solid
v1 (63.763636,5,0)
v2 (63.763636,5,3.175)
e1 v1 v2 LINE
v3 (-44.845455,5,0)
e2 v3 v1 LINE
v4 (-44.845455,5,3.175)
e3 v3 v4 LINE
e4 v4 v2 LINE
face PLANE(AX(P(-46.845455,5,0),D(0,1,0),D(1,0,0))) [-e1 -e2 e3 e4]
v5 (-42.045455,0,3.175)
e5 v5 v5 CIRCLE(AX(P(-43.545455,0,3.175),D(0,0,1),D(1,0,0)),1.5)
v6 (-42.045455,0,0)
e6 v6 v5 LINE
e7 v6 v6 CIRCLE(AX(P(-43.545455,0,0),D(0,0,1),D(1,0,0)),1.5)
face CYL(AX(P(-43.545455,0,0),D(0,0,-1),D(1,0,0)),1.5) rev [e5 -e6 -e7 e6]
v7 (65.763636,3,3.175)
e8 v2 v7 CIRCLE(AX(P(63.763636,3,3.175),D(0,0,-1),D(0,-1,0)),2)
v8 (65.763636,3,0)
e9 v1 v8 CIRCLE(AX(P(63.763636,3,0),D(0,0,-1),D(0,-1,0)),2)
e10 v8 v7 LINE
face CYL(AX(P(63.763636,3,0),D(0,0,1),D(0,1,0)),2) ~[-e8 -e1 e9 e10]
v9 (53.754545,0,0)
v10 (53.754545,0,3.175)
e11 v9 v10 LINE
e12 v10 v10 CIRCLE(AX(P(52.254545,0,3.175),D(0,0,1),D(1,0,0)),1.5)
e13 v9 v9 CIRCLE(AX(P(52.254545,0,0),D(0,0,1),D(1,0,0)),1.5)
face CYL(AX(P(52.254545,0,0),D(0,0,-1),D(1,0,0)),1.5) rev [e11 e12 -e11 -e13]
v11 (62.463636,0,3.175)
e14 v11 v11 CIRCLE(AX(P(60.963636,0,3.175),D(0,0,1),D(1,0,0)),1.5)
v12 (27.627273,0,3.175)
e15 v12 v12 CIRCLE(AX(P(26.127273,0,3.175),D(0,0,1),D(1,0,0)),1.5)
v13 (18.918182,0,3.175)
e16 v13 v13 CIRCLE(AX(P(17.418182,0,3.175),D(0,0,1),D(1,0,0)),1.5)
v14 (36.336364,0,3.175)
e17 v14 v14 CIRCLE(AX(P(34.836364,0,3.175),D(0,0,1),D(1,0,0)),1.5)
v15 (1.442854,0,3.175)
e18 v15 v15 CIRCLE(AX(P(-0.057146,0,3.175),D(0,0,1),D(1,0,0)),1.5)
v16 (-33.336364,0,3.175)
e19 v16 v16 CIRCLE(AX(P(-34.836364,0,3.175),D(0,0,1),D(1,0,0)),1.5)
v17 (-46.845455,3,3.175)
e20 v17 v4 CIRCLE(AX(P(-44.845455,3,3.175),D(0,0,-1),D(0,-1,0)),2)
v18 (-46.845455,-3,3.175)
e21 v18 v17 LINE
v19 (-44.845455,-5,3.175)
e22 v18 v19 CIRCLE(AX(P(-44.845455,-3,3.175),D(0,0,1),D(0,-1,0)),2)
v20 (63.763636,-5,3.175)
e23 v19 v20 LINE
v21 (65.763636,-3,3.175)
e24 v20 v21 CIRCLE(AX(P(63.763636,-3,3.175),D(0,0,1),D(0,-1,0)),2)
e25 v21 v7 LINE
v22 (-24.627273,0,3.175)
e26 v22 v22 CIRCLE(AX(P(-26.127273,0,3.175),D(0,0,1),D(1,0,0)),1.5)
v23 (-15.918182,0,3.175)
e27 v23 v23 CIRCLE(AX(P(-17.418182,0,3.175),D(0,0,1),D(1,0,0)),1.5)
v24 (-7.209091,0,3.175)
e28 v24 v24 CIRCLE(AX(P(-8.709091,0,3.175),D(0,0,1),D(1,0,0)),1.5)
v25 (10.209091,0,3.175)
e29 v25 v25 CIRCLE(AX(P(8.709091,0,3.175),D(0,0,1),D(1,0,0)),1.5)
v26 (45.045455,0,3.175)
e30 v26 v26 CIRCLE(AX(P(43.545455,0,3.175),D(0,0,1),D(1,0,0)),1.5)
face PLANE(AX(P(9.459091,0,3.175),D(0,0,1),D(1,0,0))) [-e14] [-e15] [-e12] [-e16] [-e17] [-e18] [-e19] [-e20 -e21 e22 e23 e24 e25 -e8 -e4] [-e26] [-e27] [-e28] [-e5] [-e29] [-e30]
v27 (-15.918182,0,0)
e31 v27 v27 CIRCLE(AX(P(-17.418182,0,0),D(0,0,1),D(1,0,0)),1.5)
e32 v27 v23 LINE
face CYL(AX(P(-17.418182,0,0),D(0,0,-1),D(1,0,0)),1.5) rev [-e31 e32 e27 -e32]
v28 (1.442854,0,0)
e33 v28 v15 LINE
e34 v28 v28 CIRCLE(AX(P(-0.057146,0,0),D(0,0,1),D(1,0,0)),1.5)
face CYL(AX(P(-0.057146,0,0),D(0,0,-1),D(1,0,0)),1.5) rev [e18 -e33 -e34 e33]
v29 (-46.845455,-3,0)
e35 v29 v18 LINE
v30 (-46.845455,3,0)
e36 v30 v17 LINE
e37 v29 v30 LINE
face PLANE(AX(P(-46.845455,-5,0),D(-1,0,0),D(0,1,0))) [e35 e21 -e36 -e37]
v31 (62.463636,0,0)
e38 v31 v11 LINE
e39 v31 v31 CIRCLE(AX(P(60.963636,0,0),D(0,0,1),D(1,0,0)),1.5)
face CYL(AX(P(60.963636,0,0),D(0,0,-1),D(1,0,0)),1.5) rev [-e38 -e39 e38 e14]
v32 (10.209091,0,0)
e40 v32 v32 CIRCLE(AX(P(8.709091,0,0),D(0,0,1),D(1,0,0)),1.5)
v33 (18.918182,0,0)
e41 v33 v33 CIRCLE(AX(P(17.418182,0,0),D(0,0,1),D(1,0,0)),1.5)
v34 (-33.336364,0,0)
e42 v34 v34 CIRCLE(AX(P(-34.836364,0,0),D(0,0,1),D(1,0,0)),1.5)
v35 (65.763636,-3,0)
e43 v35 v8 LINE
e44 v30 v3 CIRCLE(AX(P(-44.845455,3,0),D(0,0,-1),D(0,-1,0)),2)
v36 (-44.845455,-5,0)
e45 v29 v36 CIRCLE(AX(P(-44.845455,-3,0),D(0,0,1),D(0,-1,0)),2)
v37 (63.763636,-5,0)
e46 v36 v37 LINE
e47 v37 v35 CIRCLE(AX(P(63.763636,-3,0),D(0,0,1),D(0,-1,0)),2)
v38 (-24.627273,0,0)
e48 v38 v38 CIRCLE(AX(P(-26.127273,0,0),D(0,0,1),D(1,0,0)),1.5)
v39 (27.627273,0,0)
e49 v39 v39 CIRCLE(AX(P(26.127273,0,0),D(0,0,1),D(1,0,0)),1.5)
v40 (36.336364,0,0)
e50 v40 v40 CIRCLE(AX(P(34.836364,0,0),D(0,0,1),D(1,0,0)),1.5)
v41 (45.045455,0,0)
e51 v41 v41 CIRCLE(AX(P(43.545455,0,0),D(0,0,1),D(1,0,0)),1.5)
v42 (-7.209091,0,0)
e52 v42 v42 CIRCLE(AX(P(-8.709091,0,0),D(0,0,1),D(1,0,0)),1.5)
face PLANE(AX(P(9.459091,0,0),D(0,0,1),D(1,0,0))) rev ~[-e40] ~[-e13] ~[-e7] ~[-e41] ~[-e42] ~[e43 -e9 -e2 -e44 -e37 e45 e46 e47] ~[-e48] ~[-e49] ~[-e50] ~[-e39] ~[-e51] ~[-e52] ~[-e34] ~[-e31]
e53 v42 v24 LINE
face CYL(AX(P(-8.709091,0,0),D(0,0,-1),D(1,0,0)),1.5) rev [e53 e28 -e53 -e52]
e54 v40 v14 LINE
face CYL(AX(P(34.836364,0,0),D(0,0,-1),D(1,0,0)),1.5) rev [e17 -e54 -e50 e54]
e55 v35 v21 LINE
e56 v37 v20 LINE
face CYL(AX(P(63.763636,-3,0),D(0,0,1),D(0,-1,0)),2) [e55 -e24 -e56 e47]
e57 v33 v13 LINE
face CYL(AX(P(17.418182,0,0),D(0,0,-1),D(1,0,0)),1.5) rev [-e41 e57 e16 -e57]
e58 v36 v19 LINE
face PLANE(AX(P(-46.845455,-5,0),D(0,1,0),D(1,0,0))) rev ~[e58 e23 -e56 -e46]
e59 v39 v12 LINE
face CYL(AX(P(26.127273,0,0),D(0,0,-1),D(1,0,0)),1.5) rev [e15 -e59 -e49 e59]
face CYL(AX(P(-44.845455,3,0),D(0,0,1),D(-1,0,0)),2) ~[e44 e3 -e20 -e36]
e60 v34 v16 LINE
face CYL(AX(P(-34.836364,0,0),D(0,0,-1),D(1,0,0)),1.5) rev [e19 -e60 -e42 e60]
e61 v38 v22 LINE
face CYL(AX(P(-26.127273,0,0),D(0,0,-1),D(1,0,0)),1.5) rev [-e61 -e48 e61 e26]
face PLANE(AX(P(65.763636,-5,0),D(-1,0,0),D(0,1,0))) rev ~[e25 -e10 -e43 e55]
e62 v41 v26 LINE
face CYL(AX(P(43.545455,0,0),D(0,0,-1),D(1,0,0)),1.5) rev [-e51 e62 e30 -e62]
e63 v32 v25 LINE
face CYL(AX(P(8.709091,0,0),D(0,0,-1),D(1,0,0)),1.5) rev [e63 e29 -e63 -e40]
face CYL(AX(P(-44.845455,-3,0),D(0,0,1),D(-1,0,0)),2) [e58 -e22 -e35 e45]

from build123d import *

# Parameters (mm, degrees)
F0_W     = 112.6090909091
F0_H     = 10
F0_R     = 1.5
F1_DEPTH = 3.175
F2_R     = 2


# Not quite as in the source:
# - a length typed as a fraction of an inch, garbled in the dataset ("3 / 203.2 mm" for 3/8 in), is restored


with BuildPart() as f1:
    # F0 (on Top) → F1 (new body)
    with BuildSketch(Plane.XY):
        with Locations((9.4590909091, 0)):
            Rectangle(F0_W, F0_H)
        with Locations((-43.5454545455, 0)):
            Circle(F0_R, mode=Mode.SUBTRACT)
        with Locations((-34.8363636364, 0)):
            Circle(F0_R, mode=Mode.SUBTRACT)
        with Locations((-26.1272727273, 0)):
            Circle(F0_R, mode=Mode.SUBTRACT)
        with Locations((-17.4181818182, 0)):
            Circle(F0_R, mode=Mode.SUBTRACT)
        with Locations((-8.7090909091, 0)):
            Circle(F0_R, mode=Mode.SUBTRACT)
        with Locations((-0.0571461482, 0)):
            Circle(F0_R, mode=Mode.SUBTRACT)
        with Locations((8.7090909091, 0)):
            Circle(F0_R, mode=Mode.SUBTRACT)
        with Locations((17.4181818182, 0)):
            Circle(F0_R, mode=Mode.SUBTRACT)
        with Locations((26.1272727273, 0)):
            Circle(F0_R, mode=Mode.SUBTRACT)
        with Locations((34.8363636364, 0)):
            Circle(F0_R, mode=Mode.SUBTRACT)
        with Locations((43.5454545455, 0)):
            Circle(F0_R, mode=Mode.SUBTRACT)
        with Locations((52.2545454545, 0)):
            Circle(F0_R, mode=Mode.SUBTRACT)
        with Locations((60.9636363636, 0)):
            Circle(F0_R, mode=Mode.SUBTRACT)
    extrude(amount=F1_DEPTH)

    # F2
    f2_edges = [f1.edges().sort_by_distance(p)[0] for p in [
        (-46.845455, 5, 1.5875),
        (-46.845455, -5, 1.5875),
        (65.763636, 5, 1.5875),
        (65.763636, -5, 1.5875),
    ]]
    fillet(f2_edges, radius=F2_R)


solid = f1.part
